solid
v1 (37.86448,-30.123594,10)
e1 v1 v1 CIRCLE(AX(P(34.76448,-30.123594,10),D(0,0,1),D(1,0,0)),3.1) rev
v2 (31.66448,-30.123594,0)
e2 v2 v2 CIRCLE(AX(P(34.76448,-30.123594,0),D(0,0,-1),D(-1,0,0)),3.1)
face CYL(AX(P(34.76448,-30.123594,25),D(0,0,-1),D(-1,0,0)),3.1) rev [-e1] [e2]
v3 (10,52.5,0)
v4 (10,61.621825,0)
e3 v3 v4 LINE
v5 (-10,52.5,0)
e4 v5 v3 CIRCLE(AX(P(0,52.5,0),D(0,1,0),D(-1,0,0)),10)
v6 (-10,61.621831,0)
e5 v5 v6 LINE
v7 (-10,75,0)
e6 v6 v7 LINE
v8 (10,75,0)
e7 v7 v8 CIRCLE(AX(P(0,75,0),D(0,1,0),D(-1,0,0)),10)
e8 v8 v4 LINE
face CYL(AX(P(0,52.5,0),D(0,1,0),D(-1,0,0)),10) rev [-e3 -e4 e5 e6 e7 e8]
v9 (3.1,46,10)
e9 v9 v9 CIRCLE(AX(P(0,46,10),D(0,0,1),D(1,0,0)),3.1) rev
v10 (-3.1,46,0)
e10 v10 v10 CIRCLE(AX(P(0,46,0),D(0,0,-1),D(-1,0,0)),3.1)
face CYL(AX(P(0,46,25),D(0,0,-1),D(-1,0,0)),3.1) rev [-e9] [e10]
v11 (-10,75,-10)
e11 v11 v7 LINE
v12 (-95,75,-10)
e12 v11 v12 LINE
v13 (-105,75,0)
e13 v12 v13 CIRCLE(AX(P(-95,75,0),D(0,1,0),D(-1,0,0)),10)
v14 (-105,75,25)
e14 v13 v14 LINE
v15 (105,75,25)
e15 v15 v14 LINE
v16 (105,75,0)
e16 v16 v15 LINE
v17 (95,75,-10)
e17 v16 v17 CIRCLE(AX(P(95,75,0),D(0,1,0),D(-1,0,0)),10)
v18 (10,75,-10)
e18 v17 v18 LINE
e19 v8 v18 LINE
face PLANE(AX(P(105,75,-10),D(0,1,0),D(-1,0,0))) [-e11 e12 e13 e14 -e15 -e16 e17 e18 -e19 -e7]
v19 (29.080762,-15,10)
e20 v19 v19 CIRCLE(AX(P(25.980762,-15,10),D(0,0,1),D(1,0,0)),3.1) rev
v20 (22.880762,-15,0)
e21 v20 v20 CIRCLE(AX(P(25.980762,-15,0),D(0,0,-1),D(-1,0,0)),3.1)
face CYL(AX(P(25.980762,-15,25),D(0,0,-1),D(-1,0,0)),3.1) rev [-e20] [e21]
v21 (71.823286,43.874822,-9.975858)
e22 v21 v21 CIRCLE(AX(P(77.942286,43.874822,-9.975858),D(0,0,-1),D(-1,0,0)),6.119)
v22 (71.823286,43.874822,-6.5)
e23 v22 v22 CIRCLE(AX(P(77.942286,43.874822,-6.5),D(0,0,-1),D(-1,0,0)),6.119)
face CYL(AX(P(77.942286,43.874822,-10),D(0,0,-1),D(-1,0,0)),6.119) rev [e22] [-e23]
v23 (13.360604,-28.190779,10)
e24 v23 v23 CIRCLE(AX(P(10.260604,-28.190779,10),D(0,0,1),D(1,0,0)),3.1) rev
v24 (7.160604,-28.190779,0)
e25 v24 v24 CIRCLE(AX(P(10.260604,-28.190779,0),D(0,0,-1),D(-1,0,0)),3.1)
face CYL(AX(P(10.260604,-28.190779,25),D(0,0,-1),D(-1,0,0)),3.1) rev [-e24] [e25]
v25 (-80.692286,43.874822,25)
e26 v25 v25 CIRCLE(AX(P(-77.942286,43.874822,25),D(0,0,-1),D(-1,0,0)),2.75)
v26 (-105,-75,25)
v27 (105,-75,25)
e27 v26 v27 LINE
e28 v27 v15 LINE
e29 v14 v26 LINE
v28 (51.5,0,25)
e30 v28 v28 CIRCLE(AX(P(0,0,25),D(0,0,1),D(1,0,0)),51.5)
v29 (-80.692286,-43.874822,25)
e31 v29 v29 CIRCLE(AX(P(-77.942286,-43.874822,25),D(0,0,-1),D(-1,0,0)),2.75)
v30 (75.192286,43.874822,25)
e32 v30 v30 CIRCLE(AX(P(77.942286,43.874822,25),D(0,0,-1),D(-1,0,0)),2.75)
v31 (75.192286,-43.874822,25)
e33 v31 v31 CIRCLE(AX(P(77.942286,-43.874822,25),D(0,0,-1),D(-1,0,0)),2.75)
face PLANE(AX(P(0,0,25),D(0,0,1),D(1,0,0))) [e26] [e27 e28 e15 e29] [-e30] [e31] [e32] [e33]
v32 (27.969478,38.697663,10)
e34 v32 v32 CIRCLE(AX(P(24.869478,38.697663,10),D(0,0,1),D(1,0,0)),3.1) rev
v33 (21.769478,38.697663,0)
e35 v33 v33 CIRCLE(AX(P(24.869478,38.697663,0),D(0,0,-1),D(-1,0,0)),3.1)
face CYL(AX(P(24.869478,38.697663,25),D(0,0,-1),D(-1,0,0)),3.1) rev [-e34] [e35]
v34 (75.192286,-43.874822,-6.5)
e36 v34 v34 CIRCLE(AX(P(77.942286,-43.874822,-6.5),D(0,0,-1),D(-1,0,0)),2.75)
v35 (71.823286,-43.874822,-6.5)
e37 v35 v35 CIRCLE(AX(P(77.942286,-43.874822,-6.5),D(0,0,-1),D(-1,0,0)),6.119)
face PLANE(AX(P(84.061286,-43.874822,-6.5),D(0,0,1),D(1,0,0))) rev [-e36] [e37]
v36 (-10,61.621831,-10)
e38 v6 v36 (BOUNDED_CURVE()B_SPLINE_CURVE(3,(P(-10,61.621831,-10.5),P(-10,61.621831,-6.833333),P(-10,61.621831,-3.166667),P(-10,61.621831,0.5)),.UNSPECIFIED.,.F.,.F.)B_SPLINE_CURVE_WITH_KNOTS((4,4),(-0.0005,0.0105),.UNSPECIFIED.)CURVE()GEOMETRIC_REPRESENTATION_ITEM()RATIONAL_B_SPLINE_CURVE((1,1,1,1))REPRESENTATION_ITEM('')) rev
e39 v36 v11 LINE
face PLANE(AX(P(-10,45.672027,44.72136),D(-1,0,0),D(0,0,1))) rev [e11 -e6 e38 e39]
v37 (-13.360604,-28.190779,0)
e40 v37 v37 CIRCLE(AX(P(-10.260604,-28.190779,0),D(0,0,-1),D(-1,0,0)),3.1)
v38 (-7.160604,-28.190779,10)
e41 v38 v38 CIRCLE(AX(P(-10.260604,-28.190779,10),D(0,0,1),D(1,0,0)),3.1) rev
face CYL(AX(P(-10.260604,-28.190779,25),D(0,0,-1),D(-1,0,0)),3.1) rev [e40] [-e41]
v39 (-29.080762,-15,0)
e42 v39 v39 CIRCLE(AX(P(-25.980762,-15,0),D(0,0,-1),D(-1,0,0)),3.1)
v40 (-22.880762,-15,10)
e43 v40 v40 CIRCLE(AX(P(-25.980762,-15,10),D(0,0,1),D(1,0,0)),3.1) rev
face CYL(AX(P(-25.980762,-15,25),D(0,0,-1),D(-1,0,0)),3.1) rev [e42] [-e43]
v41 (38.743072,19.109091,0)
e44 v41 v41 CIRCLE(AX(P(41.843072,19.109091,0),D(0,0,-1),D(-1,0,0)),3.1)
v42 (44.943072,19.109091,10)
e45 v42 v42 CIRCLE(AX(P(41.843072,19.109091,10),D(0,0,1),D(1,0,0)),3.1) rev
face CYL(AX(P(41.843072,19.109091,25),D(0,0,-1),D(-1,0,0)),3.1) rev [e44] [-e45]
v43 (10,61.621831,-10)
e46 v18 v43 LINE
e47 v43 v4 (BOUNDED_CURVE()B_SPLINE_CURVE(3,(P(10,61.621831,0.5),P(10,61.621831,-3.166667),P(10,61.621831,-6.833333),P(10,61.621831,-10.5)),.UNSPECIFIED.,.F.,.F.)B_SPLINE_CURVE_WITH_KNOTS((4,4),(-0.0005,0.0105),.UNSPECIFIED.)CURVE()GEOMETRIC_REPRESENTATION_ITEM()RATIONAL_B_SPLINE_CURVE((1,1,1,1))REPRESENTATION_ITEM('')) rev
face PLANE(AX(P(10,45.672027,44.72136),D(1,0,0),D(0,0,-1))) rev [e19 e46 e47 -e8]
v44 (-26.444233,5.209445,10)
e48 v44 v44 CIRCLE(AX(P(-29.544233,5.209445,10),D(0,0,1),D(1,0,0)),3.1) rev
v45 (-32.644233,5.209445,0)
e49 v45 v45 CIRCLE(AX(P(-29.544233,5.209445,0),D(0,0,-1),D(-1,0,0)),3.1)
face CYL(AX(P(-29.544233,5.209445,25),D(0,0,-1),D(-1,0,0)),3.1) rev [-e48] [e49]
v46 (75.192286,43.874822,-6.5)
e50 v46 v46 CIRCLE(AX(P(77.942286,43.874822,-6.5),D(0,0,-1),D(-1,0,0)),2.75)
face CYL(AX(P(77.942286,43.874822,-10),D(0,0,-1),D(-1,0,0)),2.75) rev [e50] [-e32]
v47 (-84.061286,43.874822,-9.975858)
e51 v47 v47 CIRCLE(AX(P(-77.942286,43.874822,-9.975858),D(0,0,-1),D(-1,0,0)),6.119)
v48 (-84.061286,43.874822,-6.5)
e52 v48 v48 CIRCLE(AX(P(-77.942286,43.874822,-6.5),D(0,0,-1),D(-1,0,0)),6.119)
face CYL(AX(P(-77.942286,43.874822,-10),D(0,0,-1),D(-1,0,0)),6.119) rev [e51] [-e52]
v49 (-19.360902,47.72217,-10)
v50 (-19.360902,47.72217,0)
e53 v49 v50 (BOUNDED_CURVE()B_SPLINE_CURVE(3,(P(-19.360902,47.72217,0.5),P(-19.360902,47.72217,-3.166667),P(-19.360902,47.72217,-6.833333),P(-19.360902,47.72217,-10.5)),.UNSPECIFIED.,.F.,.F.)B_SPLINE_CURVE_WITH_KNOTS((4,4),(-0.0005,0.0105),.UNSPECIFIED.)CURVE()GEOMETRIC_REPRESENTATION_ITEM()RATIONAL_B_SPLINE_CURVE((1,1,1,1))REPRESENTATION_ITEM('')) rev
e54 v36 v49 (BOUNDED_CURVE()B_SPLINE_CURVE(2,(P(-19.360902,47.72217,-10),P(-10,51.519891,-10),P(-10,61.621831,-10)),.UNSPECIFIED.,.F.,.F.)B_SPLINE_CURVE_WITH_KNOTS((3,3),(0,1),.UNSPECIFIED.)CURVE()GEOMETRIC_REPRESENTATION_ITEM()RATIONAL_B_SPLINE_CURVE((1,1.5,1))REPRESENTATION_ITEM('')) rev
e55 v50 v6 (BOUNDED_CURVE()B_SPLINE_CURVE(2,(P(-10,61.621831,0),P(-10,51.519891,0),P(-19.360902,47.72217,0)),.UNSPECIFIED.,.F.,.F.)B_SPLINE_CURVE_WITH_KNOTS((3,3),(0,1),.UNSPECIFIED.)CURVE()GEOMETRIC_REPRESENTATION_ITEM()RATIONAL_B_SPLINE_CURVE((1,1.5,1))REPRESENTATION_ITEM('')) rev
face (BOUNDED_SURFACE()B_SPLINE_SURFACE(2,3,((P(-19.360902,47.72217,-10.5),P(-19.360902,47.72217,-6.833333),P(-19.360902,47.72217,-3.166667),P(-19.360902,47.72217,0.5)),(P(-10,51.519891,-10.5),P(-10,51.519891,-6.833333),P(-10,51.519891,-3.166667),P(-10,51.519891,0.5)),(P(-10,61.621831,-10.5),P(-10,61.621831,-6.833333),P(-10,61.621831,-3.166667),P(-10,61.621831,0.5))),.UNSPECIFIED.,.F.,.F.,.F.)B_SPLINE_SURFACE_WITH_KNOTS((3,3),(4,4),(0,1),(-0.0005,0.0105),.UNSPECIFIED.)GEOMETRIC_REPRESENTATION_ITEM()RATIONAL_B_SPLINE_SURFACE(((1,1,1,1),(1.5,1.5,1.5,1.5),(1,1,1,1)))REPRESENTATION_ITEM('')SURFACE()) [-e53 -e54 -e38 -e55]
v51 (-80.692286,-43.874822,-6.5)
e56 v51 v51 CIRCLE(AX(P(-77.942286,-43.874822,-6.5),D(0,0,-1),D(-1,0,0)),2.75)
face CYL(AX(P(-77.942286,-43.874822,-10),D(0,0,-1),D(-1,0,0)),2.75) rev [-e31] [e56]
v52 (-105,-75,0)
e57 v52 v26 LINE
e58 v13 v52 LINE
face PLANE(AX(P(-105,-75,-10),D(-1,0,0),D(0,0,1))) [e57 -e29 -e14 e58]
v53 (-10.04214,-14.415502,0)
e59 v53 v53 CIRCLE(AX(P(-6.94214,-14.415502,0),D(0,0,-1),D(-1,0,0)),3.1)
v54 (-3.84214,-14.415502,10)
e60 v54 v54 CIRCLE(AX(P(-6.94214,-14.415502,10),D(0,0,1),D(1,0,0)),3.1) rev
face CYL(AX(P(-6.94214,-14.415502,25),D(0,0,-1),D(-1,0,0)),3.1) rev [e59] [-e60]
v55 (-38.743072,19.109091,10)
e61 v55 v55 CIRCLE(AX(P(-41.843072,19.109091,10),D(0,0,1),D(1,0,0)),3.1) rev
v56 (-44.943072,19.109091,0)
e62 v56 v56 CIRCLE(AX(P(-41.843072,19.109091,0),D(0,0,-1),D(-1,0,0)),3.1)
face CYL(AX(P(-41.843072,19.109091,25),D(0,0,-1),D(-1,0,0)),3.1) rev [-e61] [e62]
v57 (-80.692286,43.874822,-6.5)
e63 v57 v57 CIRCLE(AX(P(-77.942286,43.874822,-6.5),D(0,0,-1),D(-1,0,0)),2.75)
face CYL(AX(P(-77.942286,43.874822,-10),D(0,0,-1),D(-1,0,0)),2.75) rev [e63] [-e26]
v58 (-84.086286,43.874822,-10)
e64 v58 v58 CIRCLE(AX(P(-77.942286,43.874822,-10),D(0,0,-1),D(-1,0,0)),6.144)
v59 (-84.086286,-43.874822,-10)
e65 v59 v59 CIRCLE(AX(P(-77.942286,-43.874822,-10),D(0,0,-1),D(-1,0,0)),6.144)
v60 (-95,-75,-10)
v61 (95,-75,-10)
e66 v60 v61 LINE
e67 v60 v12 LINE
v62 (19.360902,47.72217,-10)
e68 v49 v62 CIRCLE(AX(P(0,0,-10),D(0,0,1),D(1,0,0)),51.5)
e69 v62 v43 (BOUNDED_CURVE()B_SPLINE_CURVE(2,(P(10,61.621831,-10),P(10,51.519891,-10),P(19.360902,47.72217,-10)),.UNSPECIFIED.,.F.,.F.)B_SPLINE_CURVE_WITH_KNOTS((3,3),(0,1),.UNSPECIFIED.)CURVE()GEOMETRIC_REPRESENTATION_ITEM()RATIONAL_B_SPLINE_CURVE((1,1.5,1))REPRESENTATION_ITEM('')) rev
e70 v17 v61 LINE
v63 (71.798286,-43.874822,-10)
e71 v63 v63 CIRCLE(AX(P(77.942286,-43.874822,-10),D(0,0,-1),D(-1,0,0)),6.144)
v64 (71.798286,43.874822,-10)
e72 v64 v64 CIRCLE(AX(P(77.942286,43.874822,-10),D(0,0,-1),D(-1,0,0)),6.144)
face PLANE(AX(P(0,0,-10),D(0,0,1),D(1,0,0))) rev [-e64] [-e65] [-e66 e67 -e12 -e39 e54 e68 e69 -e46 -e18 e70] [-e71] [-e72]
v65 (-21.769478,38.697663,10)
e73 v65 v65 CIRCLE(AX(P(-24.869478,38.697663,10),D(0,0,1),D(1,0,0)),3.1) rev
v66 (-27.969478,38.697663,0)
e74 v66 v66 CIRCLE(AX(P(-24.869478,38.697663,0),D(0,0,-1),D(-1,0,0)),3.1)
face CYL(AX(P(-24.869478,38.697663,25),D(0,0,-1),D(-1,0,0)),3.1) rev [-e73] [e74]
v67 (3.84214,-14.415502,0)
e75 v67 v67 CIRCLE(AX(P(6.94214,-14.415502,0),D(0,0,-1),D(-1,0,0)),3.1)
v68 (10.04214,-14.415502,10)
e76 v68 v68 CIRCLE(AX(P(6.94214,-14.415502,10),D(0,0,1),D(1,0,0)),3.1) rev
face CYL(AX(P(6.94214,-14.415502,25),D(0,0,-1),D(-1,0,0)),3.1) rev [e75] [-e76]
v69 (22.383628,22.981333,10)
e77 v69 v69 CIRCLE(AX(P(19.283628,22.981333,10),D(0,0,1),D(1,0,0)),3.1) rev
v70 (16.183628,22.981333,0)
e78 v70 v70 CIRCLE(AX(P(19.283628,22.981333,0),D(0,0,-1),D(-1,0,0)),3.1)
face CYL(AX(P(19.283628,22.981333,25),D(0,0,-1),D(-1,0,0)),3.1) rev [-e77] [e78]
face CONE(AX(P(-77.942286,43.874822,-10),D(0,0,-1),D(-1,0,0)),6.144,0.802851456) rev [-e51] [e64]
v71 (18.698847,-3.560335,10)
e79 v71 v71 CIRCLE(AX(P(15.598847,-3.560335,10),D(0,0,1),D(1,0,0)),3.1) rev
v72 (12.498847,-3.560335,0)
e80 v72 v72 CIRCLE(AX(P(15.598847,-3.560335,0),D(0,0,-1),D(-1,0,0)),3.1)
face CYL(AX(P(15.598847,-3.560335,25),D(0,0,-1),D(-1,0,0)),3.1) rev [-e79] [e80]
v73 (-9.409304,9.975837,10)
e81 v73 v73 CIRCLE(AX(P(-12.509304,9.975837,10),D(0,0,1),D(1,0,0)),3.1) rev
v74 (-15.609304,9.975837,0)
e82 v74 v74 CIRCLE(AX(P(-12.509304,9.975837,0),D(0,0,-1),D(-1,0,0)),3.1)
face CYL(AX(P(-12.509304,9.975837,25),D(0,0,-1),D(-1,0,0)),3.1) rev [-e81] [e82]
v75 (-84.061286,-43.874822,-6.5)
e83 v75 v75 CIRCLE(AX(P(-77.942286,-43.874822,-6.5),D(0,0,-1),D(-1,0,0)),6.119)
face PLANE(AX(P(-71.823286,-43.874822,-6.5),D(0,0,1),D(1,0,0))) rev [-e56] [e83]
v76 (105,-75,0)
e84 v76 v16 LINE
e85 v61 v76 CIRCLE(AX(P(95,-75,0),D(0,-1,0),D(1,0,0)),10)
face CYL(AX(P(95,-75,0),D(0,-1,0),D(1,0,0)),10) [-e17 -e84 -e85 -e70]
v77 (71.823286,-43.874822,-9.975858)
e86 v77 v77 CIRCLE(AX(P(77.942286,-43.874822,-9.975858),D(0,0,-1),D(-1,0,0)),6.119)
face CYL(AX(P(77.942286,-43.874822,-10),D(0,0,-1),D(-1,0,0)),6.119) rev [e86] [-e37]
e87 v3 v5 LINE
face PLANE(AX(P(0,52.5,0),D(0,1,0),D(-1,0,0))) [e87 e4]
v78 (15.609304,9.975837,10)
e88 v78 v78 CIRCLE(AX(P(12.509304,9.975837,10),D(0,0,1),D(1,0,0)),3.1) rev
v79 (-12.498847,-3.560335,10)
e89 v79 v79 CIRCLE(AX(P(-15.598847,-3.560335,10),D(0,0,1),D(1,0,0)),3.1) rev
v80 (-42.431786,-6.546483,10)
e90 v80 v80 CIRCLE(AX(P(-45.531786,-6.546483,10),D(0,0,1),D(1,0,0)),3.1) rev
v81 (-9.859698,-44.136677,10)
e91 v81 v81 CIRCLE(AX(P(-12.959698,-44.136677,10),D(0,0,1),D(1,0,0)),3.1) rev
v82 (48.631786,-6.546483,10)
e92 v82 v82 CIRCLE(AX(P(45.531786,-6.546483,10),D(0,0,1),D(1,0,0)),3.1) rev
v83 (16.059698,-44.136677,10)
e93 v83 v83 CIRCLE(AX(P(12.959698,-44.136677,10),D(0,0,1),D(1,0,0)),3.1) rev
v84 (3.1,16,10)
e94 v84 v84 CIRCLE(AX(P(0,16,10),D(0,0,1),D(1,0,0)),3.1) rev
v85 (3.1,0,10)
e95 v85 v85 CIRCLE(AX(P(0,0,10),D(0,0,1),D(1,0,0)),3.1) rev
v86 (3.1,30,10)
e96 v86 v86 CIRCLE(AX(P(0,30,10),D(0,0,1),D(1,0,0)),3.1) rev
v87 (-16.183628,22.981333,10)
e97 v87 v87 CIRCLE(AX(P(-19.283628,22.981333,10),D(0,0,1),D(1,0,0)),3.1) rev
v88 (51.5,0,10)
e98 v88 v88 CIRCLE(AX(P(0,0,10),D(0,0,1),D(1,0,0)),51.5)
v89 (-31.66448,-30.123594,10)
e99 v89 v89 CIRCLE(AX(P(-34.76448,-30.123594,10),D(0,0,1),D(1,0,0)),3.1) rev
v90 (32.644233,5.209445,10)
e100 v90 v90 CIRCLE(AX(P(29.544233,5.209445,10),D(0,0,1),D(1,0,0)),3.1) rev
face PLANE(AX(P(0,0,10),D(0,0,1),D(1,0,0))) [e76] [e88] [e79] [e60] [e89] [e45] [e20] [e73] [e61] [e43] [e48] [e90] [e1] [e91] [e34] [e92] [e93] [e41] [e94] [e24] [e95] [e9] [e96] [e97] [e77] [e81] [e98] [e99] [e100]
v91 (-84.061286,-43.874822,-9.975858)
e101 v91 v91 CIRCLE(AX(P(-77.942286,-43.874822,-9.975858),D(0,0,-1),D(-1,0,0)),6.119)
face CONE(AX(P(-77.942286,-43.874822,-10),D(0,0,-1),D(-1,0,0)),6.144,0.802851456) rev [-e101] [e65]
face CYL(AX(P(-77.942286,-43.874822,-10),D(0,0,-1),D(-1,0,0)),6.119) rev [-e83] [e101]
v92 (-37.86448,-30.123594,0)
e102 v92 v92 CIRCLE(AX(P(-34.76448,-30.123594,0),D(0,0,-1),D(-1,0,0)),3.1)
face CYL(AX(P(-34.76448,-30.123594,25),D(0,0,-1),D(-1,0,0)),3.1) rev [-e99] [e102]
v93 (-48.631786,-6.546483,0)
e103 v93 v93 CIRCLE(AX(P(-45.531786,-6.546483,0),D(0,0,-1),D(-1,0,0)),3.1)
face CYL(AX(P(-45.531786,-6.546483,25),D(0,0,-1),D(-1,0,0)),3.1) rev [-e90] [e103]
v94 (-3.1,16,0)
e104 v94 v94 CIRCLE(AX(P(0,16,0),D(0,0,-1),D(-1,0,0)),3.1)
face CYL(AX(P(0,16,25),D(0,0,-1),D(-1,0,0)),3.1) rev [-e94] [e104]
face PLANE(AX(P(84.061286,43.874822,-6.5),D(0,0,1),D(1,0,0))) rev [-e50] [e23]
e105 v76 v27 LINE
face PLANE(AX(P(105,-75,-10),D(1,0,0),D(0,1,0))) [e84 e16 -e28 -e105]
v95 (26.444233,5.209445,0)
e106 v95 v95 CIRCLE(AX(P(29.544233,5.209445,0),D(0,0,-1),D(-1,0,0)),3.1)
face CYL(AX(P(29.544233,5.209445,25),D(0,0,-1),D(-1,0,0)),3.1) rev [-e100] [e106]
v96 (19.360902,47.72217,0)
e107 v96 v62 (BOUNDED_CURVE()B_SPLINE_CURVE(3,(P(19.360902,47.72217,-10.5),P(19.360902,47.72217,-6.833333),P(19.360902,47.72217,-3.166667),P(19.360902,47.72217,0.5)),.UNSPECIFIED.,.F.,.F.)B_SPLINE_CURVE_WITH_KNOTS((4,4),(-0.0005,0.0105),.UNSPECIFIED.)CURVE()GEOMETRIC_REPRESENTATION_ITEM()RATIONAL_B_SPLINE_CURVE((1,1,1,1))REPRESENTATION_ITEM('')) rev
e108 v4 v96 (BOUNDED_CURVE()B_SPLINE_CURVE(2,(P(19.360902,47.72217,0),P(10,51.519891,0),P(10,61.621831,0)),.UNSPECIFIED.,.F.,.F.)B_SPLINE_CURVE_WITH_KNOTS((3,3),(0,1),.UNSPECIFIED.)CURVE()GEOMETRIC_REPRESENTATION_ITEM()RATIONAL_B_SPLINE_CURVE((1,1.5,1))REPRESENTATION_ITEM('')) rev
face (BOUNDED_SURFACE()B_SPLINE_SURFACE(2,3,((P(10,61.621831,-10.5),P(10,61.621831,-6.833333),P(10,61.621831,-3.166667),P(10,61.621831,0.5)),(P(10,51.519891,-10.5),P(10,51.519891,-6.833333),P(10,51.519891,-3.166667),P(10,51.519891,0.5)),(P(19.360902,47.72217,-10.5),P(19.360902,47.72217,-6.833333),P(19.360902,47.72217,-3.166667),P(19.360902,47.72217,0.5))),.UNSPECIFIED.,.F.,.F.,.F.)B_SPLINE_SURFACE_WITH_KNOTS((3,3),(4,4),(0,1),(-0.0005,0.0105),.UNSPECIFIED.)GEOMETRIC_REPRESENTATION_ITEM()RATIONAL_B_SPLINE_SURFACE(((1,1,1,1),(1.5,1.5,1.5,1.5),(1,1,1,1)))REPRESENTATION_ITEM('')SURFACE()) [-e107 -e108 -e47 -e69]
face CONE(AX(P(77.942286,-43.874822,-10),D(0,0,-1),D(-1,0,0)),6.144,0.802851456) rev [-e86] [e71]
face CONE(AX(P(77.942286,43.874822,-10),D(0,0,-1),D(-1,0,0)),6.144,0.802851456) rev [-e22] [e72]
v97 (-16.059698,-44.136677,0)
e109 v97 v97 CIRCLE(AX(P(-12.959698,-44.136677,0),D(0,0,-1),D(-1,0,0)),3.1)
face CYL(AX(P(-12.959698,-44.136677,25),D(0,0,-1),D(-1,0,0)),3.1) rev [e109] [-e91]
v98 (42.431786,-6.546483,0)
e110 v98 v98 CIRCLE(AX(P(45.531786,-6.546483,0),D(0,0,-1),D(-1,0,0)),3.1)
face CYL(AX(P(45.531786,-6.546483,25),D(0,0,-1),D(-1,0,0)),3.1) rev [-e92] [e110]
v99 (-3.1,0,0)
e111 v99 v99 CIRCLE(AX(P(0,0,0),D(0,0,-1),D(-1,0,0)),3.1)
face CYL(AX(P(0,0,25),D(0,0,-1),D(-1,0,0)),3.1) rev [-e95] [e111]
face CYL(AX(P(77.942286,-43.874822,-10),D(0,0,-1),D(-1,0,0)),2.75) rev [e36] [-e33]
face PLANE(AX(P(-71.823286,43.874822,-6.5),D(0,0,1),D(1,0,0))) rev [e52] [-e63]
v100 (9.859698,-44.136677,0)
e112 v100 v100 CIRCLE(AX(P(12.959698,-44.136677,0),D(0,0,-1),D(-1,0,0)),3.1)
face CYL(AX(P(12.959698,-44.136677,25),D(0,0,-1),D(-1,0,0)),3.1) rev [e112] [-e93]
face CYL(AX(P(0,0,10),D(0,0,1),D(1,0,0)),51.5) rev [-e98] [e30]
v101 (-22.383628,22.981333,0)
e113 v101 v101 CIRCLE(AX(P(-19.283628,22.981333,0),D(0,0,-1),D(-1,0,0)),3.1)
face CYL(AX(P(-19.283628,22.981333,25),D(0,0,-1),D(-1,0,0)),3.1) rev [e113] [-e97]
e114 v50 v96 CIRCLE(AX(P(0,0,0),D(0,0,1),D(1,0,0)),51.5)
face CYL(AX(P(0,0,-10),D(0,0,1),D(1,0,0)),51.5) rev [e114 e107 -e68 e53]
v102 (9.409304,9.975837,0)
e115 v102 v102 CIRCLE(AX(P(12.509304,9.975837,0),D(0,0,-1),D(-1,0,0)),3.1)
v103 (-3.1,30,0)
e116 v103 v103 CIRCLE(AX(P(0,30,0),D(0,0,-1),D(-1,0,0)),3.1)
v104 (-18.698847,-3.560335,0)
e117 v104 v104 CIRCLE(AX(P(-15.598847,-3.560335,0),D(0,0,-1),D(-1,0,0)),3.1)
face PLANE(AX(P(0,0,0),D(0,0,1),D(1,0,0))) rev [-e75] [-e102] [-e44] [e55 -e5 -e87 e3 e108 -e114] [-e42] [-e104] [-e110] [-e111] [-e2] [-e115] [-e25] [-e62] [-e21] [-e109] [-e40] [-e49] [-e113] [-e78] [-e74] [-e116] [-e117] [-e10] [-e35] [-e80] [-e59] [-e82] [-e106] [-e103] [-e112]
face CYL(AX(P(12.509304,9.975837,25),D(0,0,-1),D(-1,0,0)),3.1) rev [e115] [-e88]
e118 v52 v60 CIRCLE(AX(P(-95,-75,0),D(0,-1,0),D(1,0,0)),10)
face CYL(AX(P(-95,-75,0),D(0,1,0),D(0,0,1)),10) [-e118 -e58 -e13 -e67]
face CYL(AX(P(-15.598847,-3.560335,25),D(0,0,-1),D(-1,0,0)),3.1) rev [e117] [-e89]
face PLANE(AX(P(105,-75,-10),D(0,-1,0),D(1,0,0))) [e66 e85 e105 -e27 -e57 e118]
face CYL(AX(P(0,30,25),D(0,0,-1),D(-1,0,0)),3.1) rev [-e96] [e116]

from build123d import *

# Parameters (mm, degrees)
SKETCH1_R                                 = 56
BOSS_EXTRUDE1_DEPTH                       = 25
SKETCH2_W                                 = 210
SKETCH2_H                                 = 150
SKETCH2_R                                 = 51.5
BOSS_EXTRUDE2_DEPTH                       = 35
SKETCH3_R                                 = 3.1
CUT_EXTRUDE1_DEPTH                        = 132.434394281
SKETCH7_R                                 = 51.5
CUT_EXTRUDE2_DEPTH                        = 15
CBORE_FOR_M5_HEX_BOLT_GRADE_C1_AT_2_COUNT = 2
CBORE_FOR_M5_HEX_BOLT_GRADE_C1_AT_2_PITCH = 87.749643874
CBORE_FOR_M5_HEX_BOLT_GRADE_C1_AT_3_COUNT = 2
CBORE_FOR_M5_HEX_BOLT_GRADE_C1_AT_3_PITCH = 155.884572681
CBORE_FOR_M5_HEX_BOLT_GRADE_C1_AT_4_COUNT = 2
CBORE_FOR_M5_HEX_BOLT_GRADE_C1_AT_4_PITCH = 178.8854382
SKETCH17_W                                = 20
SKETCH17_H                                = 40
CUT_EXTRUDE4_DEPTH                        = 10
SKETCH18_R                                = 10
CUT_EXTRUDE5_DEPTH                        = 22.5
FILLET6_R                                 = 10


with BuildPart() as part:
    # Sketch1 → Boss-Extrude1 (new body)
    with BuildSketch(Plane.XY):
        Circle(SKETCH1_R)
    extrude(amount=BOSS_EXTRUDE1_DEPTH)

    # Sketch2 → Boss-Extrude2 (add)
    with BuildSketch(Plane.XY.offset(25)):
        Rectangle(SKETCH2_W, SKETCH2_H)
        Circle(SKETCH2_R, mode=Mode.SUBTRACT)
    extrude(amount=-BOSS_EXTRUDE2_DEPTH)

    # Sketch3 → Cut-Extrude1 (cut, through all)
    with BuildSketch(Plane(origin=(0, 0, 0), x_dir=(-1, 0, 0), z_dir=(0, 0, -1))):
        with Locations((0, 46)):
            Circle(SKETCH3_R)
        with Locations((0, 30)):
            Circle(SKETCH3_R)
        with Locations((0, 16)):
            Circle(SKETCH3_R)
        with Locations((12.509303719, 9.97583683)):
            Circle(SKETCH3_R)
        with Locations((15.598846595, -3.560334943)):
            Circle(SKETCH3_R)
        with Locations((6.942139826, -14.415501886)):
            Circle(SKETCH3_R)
        with Locations((-6.942139826, -14.415501886)):
            Circle(SKETCH3_R)
        with Locations((-15.598846595, -3.560334943)):
            Circle(SKETCH3_R)
        with Locations((-12.509303719, 9.97583683)):
            Circle(SKETCH3_R)
        with Locations((19.283628291, 22.981333294)):
            Circle(SKETCH3_R)
        with Locations((29.54423259, 5.20944533)):
            Circle(SKETCH3_R)
        with Locations((25.980762114, -15)):
            Circle(SKETCH3_R)
        with Locations((10.2606043, -28.190778624)):
            Circle(SKETCH3_R)
        with Locations((-10.2606043, -28.190778624)):
            Circle(SKETCH3_R)
        with Locations((-25.980762114, -15)):
            Circle(SKETCH3_R)
        with Locations((-29.54423259, 5.20944533)):
            Circle(SKETCH3_R)
        with Locations((-19.283628291, 22.981333294)):
            Circle(SKETCH3_R)
        with Locations((24.869477603, 38.69766251)):
            Circle(SKETCH3_R)
        with Locations((41.843071786, 19.109090598)):
            Circle(SKETCH3_R)
        with Locations((45.531786327, -6.546482561)):
            Circle(SKETCH3_R)
        with Locations((34.76448042, -30.123593761)):
            Circle(SKETCH3_R)
        with Locations((12.959697615, -44.136676786)):
            Circle(SKETCH3_R)
        with Locations((-12.959697615, -44.136676786)):
            Circle(SKETCH3_R)
        with Locations((-34.76448042, -30.123593761)):
            Circle(SKETCH3_R)
        with Locations((-45.531786327, -6.546482561)):
            Circle(SKETCH3_R)
        with Locations((-41.843071786, 19.109090598)):
            Circle(SKETCH3_R)
        with Locations((-24.869477603, 38.69766251)):
            Circle(SKETCH3_R)
        Circle(SKETCH3_R)
    extrude(amount=-CUT_EXTRUDE1_DEPTH, mode=Mode.SUBTRACT)

    # Sketch7 → Cut-Extrude2 (cut)
    with BuildSketch(Plane.XY.offset(25)):
        Circle(SKETCH7_R)
    extrude(amount=-CUT_EXTRUDE2_DEPTH, mode=Mode.SUBTRACT)

    # Sketch12 → CBORE for M5 Hex Bolt Grade C1 (revolve, cut)
    with BuildSketch(Plane(origin=(77.942286341, 43.874821937, -10), x_dir=(0, 1, 0), z_dir=(1, 0, 0))):
        Polygon((0, 0), (0, 35), (2.75, 35), (2.75, 3.5), (6.119, 3.5), (6.119, 0.024142219), (6.144, 0), align=None)
    cbore_for_m5_hex_bolt_grade_c1 = revolve(axis=Axis((77.942286341, 43.874821937, -16.35), (0, 0, 1)), mode=Mode.SUBTRACT)

    # CBORE for M5 Hex Bolt Grade C1 at 2: CBORE for M5 Hex Bolt Grade C1 ×2
    with Locations(*[(0, -i * CBORE_FOR_M5_HEX_BOLT_GRADE_C1_AT_2_PITCH, 0) for i in range(1, CBORE_FOR_M5_HEX_BOLT_GRADE_C1_AT_2_COUNT)]):
        add(cbore_for_m5_hex_bolt_grade_c1, mode=Mode.SUBTRACT)

    # CBORE for M5 Hex Bolt Grade C1 at 3: CBORE for M5 Hex Bolt Grade C1 ×2
    with Locations(*[(-i * CBORE_FOR_M5_HEX_BOLT_GRADE_C1_AT_3_PITCH, 0, 0) for i in range(1, CBORE_FOR_M5_HEX_BOLT_GRADE_C1_AT_3_COUNT)]):
        add(cbore_for_m5_hex_bolt_grade_c1, mode=Mode.SUBTRACT)

    # CBORE for M5 Hex Bolt Grade C1 at 4: CBORE for M5 Hex Bolt Grade C1 ×2
    with Locations(*[Vector(-0.8714212528966683, -0.4905354217587157, 0) * (i * CBORE_FOR_M5_HEX_BOLT_GRADE_C1_AT_4_PITCH) for i in range(1, CBORE_FOR_M5_HEX_BOLT_GRADE_C1_AT_4_COUNT)]):
        add(cbore_for_m5_hex_bolt_grade_c1, mode=Mode.SUBTRACT)

    # Sketch17 → Cut-Extrude4 (cut)
    with BuildSketch(Plane(origin=(0, 0, -10), x_dir=(-1, 0, 0), z_dir=(0, 0, -1))):
        with Locations((0, 65.672027366)):
            Rectangle(SKETCH17_W, SKETCH17_H)
    extrude(amount=-CUT_EXTRUDE4_DEPTH, mode=Mode.SUBTRACT)

    # Sketch18 → Cut-Extrude5 (cut)
    with BuildSketch(Plane(origin=(0, 75, 0), x_dir=(1, 0, 0), z_dir=(0, 1, 0))):
        Circle(SKETCH18_R)
    extrude(amount=-CUT_EXTRUDE5_DEPTH, mode=Mode.SUBTRACT)

    # Fillet6
    fillet6_edges = [part.edges().sort_by_distance(p)[0] for p in [
        (-105, 0, -10),
        (105, 0, -10),
    ]]
    fillet(fillet6_edges, radius=FILLET6_R)

    # Fillet7
    # a fillet whose section is not a circle: 15 mm, written as the material it takes off along each edge
    with BuildSketch(Plane(origin=(10, 50.519798099, -37.75508112), x_dir=(0, 1, 0), z_dir=(0, 0, 1))) as fillet7_piece_1:
        with BuildLine():
            Bezier((11.102032448, 0), (1.000093014, 0), (-2.797628578, -9.360902256), weights=[1, 1.5, 1])
            ThreePointArc((-2.797628578, -9.360902256), (-1.176331731, -4.746942962), (0, 0))
            Line((0, 0), (11.102032448, 0))
        make_face()
    extrude(amount=37.75508112, mode=Mode.SUBTRACT)
    with BuildSketch(Plane(origin=(-10, 50.519798099, -37.75508112), x_dir=(0, 1, 0), z_dir=(0, 0, 1))) as fillet7_piece_2:
        with BuildLine():
            Bezier((11.102032448, 0), (1.000093014, 0), (-2.797628578, 9.360902256), weights=[1, 1.5, 1])
            ThreePointArc((-2.797628578, 9.360902256), (-1.176331731, 4.746942962), (0, 0))
            Line((0, 0), (11.102032448, 0))
        make_face()
    extrude(amount=37.75508112, mode=Mode.SUBTRACT)


solid = part.part
